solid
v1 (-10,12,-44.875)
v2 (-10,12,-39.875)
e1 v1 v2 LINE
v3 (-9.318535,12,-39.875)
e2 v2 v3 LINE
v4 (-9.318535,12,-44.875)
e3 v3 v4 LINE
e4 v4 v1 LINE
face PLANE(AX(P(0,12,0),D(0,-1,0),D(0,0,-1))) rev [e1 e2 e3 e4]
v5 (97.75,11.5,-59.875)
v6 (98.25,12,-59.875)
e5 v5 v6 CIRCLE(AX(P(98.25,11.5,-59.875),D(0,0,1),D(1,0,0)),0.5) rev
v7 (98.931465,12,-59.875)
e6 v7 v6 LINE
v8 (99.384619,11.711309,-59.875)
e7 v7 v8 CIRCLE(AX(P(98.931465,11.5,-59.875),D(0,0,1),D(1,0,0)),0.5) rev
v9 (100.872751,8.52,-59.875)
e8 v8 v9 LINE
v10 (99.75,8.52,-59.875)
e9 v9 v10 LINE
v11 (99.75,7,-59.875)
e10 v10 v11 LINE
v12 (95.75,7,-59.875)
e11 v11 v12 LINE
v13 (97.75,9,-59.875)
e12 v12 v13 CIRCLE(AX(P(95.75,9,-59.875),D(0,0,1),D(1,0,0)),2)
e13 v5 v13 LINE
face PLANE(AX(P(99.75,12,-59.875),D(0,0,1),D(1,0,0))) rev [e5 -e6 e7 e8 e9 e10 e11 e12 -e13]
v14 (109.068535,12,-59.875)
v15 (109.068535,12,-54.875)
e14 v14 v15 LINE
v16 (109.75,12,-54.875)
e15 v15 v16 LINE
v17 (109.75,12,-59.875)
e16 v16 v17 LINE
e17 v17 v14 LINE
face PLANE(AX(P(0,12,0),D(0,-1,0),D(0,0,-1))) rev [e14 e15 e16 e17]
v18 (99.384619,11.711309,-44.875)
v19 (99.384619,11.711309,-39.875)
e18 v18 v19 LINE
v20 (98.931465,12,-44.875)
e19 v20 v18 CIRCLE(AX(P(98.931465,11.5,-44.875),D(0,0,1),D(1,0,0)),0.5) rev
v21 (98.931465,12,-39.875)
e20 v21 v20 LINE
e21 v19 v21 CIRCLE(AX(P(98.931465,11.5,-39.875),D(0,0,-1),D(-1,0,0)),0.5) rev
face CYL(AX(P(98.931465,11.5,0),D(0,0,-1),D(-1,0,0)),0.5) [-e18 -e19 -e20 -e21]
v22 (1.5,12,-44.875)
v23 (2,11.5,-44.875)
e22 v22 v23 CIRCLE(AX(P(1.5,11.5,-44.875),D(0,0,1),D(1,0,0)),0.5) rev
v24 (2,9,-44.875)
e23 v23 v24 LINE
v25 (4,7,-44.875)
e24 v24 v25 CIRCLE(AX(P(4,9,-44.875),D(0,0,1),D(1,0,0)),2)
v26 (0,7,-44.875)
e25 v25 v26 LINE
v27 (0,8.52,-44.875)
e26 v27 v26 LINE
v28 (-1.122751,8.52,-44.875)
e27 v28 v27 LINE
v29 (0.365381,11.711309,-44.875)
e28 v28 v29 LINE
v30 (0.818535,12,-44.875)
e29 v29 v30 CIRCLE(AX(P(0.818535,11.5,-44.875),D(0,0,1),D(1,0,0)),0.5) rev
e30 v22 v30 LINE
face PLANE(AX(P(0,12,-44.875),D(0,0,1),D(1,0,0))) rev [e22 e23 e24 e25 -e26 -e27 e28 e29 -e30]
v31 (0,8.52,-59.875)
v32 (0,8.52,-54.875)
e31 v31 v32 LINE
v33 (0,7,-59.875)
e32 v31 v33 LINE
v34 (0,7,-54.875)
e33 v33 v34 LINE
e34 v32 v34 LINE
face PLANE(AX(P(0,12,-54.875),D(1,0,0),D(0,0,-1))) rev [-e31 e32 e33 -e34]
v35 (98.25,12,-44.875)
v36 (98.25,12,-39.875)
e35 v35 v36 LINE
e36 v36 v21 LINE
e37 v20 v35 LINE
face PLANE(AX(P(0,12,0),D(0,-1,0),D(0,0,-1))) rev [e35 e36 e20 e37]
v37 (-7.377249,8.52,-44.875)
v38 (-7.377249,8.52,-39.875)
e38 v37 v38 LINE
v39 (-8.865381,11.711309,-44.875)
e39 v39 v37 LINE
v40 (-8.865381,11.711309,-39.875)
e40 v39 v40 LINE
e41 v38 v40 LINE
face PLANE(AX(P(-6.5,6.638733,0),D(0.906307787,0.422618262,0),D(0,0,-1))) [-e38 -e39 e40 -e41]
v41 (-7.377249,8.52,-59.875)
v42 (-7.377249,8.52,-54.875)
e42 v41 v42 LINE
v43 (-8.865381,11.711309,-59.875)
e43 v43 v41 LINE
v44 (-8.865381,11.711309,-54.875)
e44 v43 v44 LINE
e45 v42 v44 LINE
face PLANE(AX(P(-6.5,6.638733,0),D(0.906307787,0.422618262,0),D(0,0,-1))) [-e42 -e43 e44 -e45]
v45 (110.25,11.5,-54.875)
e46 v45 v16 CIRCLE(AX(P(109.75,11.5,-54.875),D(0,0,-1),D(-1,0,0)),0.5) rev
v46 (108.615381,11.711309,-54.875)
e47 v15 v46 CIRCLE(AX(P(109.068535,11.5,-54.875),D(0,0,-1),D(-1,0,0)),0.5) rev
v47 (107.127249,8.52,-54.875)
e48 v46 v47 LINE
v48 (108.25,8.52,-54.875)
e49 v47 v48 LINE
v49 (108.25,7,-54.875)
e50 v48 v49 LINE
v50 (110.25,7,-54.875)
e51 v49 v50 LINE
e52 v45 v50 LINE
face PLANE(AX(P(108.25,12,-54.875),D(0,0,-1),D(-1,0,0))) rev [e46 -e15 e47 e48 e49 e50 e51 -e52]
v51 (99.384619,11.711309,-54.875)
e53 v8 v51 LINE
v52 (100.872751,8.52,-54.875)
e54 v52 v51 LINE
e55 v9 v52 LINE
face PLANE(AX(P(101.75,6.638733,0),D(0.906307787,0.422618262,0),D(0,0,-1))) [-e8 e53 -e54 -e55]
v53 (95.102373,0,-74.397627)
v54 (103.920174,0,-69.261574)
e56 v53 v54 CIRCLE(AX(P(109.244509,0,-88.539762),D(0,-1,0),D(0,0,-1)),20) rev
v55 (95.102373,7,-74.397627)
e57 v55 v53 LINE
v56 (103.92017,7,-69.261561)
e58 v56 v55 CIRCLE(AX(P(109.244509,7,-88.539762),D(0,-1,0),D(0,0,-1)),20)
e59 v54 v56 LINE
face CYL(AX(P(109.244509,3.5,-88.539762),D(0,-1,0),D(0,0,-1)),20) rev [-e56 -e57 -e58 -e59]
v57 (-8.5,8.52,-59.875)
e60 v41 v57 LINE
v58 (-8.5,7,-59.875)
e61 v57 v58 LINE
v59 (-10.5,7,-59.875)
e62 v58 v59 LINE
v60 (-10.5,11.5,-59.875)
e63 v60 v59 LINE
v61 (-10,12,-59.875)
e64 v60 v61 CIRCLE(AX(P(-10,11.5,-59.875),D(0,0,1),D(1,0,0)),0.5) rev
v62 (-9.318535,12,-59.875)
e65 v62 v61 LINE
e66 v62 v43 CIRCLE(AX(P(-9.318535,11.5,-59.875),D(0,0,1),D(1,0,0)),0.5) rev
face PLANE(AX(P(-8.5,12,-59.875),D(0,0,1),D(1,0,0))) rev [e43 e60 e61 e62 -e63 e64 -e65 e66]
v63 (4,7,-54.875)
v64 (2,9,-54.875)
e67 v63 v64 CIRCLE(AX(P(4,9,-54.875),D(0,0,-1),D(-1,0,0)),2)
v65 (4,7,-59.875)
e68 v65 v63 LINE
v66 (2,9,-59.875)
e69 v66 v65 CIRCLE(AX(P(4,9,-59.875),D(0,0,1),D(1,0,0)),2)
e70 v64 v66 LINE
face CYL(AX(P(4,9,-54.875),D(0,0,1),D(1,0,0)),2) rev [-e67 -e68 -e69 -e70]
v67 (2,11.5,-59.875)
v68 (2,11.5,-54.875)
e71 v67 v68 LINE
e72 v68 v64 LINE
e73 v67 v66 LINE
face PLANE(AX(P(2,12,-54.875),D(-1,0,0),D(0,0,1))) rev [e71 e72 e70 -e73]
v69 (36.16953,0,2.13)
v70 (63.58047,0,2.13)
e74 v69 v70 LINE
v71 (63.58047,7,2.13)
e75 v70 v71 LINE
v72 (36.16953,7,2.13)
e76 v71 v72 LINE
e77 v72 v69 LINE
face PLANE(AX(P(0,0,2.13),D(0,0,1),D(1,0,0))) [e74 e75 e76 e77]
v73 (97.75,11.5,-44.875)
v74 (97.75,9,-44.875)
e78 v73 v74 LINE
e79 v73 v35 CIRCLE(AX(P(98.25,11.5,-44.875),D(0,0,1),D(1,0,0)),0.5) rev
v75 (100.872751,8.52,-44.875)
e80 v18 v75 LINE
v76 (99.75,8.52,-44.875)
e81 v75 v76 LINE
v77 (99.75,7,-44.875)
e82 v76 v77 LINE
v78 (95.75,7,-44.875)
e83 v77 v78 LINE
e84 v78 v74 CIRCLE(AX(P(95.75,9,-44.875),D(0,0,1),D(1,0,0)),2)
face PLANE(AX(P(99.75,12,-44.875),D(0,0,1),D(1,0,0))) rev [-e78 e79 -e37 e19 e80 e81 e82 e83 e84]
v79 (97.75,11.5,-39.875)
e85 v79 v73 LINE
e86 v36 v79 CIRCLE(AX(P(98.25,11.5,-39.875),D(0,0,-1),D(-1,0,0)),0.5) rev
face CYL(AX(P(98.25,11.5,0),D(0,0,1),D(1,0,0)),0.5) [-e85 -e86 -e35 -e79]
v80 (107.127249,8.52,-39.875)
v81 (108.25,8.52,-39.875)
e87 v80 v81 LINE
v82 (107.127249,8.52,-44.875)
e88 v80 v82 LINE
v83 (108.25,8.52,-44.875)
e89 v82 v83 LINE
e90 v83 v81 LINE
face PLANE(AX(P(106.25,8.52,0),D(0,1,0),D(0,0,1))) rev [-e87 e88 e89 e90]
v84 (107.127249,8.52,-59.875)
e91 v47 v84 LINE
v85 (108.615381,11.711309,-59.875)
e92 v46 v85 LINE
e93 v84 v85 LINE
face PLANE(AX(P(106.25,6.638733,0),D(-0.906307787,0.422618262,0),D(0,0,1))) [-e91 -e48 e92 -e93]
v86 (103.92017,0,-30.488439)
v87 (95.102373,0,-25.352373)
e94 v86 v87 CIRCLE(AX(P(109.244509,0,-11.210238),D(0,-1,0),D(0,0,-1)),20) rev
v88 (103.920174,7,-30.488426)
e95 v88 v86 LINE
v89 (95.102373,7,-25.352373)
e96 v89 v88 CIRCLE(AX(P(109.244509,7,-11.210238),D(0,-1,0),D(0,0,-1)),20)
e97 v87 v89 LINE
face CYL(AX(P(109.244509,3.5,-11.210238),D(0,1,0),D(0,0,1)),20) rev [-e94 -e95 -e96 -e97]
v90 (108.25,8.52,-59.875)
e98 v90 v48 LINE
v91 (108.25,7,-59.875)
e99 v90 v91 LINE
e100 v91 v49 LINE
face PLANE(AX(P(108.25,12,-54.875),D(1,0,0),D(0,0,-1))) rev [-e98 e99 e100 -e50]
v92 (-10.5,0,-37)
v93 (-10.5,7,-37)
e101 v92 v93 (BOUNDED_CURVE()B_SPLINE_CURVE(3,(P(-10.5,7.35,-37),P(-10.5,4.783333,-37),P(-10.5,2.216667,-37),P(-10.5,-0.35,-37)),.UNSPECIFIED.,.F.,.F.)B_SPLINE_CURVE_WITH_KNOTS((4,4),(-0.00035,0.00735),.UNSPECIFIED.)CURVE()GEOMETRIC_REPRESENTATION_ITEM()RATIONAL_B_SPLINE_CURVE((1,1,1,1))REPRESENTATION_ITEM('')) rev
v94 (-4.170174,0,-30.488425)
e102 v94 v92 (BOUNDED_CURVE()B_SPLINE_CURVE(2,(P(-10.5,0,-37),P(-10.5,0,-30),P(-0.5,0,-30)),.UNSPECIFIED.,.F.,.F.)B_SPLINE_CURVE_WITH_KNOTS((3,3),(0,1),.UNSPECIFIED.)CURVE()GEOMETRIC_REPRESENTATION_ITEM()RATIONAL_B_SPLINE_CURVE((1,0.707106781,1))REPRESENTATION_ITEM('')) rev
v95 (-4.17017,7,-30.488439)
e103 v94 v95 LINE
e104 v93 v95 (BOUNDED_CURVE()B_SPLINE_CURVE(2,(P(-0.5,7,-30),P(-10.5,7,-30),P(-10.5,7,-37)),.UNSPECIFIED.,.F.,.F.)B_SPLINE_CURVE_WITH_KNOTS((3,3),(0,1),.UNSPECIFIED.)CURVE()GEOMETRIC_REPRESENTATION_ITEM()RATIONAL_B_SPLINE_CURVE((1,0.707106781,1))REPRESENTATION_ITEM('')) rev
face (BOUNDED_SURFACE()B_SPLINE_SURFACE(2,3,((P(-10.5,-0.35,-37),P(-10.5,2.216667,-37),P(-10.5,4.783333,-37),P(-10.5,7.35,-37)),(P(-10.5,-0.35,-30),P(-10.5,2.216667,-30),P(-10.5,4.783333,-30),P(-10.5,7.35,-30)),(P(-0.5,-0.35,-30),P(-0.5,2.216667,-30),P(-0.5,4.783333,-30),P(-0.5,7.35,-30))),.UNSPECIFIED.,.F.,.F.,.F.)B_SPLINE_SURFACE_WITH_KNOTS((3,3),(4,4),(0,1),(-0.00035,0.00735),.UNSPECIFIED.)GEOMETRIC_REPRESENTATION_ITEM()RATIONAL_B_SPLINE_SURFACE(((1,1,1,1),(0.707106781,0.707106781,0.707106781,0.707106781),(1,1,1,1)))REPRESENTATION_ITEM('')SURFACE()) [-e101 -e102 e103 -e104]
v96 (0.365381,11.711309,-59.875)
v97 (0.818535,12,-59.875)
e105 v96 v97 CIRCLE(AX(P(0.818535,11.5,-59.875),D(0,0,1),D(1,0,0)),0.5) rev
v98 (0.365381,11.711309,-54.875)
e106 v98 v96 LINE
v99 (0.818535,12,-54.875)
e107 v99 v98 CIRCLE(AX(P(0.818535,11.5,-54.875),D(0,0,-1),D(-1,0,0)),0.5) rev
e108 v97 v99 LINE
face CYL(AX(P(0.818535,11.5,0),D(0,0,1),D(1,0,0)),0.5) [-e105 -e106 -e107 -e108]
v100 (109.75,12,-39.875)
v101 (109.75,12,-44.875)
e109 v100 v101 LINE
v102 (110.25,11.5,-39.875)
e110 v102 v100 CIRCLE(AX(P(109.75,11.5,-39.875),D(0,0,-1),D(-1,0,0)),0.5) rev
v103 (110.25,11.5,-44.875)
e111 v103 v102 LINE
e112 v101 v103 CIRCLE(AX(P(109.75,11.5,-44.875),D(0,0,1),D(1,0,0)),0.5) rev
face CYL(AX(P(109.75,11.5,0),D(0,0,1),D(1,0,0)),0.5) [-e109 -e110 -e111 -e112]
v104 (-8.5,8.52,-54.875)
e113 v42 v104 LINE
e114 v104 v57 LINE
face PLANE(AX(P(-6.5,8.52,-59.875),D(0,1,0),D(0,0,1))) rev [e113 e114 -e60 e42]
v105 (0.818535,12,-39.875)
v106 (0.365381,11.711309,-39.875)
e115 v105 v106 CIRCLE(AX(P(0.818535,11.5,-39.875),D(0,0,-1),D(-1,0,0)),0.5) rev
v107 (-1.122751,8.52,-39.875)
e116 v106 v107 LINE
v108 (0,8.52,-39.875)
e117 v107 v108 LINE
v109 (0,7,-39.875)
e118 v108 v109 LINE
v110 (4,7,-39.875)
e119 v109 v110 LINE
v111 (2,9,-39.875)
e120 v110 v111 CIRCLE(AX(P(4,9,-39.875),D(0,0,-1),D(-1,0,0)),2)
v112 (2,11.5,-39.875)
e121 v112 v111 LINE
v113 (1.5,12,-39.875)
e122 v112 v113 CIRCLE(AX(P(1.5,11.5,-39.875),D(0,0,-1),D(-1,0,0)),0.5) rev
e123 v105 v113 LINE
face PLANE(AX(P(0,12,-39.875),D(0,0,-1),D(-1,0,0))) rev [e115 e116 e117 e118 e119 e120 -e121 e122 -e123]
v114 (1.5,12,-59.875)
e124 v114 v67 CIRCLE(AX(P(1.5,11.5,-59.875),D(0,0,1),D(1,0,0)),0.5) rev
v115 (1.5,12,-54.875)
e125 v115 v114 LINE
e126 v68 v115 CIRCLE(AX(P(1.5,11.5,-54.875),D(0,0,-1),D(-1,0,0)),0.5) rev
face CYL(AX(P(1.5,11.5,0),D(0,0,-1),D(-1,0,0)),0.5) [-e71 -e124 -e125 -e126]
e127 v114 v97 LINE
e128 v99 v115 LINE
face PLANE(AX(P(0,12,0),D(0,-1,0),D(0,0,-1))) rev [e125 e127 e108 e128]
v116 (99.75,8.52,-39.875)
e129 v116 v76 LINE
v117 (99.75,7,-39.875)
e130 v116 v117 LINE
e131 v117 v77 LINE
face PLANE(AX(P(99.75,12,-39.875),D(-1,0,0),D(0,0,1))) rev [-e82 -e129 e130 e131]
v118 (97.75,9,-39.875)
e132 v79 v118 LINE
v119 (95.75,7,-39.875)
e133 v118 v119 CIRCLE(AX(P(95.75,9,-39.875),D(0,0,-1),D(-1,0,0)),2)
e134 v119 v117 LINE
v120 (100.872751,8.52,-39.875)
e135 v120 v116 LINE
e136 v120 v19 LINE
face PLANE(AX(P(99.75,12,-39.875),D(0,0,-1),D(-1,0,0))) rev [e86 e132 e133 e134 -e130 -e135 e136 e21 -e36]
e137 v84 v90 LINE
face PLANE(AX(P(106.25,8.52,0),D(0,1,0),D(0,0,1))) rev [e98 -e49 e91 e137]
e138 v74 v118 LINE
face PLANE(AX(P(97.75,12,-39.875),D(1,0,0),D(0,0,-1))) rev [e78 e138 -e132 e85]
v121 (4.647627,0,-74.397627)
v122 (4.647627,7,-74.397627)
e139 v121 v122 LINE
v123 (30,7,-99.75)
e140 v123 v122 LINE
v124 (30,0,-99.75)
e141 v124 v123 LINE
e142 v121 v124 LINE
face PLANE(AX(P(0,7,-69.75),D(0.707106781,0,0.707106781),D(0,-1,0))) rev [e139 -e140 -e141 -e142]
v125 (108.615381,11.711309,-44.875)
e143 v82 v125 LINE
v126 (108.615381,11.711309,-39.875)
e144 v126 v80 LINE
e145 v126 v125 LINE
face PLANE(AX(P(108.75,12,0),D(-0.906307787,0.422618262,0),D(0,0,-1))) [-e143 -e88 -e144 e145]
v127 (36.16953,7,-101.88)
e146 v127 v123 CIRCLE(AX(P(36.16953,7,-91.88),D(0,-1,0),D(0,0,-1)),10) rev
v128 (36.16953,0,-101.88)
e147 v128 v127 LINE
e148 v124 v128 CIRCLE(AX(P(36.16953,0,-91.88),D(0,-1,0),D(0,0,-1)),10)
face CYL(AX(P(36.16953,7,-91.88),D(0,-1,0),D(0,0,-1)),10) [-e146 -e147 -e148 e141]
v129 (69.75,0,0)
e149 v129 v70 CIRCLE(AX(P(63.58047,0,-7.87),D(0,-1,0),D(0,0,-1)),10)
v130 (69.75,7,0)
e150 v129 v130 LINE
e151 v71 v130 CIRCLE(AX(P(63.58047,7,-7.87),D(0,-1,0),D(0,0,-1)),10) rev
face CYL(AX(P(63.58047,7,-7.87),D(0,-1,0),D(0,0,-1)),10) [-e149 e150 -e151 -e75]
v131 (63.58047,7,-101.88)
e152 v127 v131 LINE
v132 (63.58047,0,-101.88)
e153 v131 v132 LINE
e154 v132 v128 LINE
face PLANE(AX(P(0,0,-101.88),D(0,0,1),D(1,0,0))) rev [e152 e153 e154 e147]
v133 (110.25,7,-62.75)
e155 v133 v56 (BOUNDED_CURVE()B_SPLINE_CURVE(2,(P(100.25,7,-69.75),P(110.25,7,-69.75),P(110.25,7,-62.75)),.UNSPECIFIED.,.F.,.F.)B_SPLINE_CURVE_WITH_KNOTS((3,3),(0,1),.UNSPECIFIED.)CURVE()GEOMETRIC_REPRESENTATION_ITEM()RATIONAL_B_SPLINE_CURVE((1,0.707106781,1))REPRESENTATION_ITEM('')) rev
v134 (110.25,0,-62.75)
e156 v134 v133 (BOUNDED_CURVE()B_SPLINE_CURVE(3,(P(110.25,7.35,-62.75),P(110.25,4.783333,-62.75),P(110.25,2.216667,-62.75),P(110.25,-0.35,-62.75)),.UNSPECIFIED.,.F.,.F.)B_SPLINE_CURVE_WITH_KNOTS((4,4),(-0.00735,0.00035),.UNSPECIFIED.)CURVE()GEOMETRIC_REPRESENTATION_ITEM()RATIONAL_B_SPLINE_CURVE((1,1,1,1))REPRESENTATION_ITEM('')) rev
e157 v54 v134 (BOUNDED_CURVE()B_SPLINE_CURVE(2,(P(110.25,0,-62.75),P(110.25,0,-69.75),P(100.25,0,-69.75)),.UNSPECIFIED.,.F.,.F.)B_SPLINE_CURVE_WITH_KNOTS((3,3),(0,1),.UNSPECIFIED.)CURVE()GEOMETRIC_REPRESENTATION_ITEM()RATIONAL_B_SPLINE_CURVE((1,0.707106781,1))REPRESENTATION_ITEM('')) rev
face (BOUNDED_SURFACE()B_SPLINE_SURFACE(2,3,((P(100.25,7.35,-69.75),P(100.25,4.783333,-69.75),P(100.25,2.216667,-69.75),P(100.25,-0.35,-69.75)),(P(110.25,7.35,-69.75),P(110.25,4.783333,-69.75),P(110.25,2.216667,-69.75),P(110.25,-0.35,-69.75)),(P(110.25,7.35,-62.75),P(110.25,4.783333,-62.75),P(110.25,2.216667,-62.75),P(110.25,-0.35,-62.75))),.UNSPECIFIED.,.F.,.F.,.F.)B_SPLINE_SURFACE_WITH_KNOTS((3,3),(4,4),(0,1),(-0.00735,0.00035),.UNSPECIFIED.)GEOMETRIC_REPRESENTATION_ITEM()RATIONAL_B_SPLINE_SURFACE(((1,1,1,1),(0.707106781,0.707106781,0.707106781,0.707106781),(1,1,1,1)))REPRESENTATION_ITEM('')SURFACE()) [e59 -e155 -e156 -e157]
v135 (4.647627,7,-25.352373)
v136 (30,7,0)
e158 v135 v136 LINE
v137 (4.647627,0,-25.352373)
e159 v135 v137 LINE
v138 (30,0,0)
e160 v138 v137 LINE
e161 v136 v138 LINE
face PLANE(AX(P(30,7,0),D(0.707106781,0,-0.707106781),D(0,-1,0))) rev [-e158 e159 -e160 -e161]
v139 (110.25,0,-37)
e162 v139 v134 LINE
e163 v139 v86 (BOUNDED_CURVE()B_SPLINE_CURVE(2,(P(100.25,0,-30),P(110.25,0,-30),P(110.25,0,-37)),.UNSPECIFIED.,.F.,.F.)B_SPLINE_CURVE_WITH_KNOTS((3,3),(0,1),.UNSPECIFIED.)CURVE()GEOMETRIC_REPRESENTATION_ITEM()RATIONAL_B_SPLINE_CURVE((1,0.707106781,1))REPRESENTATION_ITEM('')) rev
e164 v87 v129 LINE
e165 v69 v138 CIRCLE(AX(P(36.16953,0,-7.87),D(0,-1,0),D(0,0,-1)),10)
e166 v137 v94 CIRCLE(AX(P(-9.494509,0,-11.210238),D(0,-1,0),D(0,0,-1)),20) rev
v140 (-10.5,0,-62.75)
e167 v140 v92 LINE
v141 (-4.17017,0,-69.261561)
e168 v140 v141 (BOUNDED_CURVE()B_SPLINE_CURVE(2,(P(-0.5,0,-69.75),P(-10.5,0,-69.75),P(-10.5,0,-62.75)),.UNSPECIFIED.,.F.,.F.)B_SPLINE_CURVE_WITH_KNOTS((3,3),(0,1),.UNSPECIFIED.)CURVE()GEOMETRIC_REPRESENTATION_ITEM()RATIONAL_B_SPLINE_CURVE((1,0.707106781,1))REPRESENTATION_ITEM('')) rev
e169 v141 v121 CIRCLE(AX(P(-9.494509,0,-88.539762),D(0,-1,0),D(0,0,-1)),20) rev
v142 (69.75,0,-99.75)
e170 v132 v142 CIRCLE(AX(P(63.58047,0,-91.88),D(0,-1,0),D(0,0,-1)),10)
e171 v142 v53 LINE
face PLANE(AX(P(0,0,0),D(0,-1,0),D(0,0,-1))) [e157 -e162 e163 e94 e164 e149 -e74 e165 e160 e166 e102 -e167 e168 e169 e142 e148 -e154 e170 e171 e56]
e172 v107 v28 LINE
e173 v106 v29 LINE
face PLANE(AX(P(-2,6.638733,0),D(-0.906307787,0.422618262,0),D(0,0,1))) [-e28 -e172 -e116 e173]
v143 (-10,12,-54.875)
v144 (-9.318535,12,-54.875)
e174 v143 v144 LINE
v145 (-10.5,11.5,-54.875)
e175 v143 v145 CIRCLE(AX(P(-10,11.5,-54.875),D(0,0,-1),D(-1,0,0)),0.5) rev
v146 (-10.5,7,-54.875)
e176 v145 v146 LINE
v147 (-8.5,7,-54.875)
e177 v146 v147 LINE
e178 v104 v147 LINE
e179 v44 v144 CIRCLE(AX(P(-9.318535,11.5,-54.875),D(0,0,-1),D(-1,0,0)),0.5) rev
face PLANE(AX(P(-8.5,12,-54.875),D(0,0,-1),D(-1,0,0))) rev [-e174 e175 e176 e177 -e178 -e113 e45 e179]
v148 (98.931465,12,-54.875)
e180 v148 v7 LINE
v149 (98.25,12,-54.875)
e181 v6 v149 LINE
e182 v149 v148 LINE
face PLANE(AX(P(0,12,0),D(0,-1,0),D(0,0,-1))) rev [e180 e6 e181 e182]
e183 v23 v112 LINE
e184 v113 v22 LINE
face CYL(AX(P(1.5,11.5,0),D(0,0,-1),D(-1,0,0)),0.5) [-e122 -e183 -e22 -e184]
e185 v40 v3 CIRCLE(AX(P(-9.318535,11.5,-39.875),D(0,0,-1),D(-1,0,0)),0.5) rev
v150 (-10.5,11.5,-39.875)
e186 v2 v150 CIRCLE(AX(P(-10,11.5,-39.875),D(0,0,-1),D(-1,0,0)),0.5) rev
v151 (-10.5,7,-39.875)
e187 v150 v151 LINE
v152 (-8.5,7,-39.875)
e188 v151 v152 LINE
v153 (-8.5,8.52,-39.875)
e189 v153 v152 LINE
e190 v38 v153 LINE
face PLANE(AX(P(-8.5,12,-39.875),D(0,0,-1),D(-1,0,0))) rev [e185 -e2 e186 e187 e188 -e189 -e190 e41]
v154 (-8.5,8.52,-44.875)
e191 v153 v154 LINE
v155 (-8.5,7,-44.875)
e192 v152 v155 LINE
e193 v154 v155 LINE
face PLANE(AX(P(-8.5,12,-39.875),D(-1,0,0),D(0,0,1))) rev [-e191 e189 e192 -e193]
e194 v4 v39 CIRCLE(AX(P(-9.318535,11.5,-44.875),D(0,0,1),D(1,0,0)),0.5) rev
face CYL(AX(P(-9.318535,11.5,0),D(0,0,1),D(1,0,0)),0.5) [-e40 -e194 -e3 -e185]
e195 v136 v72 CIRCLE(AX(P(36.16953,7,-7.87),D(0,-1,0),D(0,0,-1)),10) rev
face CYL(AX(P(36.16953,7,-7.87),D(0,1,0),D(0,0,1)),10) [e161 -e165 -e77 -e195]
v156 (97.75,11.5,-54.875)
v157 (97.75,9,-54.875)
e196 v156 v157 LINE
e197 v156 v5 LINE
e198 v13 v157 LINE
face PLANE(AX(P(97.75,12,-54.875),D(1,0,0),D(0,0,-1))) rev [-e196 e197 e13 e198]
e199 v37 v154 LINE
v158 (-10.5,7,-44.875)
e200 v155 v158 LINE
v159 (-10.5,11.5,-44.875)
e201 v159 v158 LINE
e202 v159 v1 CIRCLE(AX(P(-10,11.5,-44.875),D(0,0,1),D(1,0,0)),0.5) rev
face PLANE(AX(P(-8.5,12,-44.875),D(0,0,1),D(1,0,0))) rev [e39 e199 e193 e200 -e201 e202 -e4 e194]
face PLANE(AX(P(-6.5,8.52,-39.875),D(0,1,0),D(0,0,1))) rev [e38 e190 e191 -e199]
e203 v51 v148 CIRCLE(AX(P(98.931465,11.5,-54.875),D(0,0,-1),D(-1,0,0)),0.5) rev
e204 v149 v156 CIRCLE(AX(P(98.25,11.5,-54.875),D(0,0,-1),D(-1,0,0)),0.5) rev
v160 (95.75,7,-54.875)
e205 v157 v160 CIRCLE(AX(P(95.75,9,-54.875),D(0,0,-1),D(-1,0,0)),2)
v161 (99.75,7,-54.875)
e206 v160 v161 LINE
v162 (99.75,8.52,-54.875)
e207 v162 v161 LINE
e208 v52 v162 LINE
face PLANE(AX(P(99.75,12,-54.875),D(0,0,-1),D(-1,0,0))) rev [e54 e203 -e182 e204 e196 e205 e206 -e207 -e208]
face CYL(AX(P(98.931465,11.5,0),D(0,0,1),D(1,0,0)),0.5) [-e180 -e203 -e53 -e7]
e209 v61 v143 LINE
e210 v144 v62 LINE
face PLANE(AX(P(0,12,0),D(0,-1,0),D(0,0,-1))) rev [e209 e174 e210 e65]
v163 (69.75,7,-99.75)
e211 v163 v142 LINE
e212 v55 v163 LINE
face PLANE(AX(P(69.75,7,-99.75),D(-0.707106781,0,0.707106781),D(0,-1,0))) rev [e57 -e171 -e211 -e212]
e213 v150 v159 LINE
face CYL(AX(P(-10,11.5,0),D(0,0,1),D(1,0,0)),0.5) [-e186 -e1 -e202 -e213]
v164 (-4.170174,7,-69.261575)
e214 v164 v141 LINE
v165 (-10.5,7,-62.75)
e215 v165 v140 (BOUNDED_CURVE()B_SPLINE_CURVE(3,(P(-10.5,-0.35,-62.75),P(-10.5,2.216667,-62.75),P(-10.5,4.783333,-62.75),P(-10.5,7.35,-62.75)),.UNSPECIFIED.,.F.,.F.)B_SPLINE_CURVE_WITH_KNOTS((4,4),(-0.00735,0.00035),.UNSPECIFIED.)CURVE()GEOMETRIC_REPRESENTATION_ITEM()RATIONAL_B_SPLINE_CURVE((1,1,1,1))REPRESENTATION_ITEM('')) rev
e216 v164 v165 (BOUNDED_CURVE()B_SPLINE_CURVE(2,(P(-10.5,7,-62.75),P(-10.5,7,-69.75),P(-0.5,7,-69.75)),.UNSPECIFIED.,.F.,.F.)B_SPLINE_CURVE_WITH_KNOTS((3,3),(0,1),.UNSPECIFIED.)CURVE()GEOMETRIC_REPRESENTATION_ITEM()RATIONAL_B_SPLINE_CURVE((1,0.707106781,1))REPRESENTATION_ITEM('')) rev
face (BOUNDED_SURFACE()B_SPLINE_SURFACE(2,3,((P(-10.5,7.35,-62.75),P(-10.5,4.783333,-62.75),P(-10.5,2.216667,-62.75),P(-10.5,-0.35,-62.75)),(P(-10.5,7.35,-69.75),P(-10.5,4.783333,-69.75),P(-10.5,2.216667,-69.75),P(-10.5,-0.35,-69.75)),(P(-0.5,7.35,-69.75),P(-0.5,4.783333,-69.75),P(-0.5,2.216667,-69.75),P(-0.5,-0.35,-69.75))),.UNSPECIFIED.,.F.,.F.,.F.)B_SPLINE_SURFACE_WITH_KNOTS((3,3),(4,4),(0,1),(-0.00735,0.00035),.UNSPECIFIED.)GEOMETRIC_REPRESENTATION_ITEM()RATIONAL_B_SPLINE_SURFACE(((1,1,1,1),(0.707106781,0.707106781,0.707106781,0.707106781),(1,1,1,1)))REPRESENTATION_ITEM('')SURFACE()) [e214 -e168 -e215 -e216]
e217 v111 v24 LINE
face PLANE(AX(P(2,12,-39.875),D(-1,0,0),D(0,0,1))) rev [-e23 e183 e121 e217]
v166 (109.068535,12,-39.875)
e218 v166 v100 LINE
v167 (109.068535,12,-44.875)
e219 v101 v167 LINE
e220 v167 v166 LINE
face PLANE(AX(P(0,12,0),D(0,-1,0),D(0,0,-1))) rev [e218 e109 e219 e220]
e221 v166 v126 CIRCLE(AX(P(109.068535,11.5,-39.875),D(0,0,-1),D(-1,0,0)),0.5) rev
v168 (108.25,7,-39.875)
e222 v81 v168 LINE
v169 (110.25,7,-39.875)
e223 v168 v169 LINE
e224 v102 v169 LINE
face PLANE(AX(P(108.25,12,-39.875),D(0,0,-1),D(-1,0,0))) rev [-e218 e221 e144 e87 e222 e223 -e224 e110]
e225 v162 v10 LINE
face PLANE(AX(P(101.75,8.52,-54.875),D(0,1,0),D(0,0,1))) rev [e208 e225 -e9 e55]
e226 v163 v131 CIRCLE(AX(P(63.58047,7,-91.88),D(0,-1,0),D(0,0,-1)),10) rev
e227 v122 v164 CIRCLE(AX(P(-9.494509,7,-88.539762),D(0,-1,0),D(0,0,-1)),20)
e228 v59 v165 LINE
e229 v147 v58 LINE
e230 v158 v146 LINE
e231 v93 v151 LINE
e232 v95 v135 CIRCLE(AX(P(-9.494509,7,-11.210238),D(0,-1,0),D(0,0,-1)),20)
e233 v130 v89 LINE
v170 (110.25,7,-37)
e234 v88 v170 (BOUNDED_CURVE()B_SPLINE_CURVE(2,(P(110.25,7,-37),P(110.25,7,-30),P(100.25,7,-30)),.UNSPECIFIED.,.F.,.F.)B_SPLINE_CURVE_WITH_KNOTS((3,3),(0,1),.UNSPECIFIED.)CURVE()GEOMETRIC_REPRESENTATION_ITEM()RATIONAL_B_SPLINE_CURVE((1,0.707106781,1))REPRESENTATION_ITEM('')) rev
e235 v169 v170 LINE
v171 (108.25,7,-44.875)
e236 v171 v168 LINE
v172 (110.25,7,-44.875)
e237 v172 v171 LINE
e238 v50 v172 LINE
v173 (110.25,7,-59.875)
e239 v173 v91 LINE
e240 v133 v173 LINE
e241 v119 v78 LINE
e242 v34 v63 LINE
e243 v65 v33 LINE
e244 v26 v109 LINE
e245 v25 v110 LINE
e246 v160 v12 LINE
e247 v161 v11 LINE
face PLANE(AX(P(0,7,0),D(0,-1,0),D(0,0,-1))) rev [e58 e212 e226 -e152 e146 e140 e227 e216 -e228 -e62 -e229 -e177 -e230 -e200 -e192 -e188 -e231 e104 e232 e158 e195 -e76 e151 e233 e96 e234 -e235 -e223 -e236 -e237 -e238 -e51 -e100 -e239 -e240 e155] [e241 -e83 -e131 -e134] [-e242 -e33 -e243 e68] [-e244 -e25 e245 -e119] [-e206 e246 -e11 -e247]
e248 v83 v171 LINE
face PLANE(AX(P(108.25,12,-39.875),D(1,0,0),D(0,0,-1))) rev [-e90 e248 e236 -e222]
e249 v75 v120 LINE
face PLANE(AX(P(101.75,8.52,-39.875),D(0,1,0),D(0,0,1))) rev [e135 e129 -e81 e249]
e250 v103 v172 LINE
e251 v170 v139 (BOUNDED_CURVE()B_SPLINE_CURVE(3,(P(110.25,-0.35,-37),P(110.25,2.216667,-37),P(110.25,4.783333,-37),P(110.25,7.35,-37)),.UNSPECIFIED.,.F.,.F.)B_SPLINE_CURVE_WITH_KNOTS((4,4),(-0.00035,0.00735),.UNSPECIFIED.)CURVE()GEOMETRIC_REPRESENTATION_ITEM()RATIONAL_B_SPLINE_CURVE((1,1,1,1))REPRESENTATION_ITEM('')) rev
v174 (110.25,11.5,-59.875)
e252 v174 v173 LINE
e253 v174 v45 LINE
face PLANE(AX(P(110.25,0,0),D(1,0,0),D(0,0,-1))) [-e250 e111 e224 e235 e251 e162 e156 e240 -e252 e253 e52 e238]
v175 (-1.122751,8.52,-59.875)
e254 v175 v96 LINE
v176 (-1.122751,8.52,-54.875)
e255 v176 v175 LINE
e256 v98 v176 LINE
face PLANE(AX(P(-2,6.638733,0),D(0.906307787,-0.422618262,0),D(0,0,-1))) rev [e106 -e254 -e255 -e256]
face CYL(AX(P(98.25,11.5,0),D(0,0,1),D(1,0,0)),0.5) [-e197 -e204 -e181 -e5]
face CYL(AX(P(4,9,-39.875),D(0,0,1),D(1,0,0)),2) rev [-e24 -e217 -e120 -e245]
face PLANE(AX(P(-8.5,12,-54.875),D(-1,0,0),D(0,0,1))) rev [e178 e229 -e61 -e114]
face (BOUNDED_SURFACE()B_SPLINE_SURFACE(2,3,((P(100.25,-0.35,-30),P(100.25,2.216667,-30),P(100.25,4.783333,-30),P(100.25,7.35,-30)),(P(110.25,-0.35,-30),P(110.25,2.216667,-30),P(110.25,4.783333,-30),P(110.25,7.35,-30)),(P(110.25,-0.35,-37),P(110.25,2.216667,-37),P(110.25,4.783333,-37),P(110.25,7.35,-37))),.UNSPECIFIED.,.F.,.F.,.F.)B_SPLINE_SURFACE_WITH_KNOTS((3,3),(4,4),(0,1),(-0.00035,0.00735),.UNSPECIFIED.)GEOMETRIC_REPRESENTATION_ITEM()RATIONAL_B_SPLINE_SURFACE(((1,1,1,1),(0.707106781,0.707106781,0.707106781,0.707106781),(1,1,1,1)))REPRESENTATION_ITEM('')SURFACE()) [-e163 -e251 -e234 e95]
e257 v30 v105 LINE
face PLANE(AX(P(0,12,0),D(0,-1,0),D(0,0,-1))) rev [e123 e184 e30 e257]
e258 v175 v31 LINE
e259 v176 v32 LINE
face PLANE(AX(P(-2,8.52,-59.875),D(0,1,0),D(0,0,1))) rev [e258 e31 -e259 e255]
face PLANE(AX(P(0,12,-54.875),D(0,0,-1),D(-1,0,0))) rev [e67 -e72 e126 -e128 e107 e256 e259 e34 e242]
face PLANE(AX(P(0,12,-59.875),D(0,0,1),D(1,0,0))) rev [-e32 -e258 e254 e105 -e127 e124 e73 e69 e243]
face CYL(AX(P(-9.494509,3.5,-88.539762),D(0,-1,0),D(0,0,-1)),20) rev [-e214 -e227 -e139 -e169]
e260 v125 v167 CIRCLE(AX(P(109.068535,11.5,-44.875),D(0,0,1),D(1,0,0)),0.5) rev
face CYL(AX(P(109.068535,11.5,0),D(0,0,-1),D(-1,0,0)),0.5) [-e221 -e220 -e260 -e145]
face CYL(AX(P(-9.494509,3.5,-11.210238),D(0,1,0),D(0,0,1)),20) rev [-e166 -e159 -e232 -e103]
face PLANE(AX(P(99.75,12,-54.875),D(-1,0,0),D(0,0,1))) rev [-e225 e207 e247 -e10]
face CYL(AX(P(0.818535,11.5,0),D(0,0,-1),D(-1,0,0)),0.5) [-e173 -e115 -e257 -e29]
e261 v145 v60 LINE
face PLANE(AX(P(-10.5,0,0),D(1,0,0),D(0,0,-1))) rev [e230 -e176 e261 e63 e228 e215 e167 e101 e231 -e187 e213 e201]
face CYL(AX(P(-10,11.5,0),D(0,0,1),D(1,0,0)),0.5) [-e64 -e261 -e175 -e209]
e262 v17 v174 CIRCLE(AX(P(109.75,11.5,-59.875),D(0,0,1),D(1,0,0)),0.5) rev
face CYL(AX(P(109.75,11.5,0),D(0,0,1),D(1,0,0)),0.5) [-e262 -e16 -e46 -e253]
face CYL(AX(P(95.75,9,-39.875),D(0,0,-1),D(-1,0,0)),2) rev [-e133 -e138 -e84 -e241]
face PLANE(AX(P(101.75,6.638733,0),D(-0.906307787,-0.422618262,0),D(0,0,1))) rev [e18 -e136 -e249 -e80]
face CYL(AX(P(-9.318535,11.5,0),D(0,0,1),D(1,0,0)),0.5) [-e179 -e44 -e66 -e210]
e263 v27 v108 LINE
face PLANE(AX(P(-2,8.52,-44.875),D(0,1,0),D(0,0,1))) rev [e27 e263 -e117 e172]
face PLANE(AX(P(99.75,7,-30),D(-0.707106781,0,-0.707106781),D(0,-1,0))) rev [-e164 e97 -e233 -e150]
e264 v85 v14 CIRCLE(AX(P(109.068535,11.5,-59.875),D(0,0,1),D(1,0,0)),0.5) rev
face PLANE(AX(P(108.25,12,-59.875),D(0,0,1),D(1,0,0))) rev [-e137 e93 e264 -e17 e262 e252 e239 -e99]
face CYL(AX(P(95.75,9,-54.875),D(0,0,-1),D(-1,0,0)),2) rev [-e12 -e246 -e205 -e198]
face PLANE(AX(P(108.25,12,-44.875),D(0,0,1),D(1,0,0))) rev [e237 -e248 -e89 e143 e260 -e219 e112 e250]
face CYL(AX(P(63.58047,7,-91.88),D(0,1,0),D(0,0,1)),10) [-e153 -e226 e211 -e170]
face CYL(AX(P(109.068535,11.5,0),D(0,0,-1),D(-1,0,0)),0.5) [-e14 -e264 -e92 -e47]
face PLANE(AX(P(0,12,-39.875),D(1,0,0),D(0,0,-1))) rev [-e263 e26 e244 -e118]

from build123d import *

# Parameters (mm, degrees)
SKETCH1_W            = 99.75
SKETCH1_H            = 99.75
BOSS_EXTRUDE5_DEPTH  = 7
CHAMFER2_SIZE        = 30
SKETCH6_W            = 39.75
SKETCH6_H            = 7
BOSS_EXTRUDE7_DEPTH  = 2.13
SKETCH8_W            = 39.75
SKETCH8_H            = 7
BOSS_EXTRUDE10_DEPTH = 2.13
SKETCH12_W           = 39.75
SKETCH12_H           = 7
BOSS_EXTRUDE14_DEPTH = 10.5
SKETCH14_W           = 39.75
SKETCH14_H           = 7
BOSS_EXTRUDE16_DEPTH = 10.5
SKETCH15_W           = 2
SKETCH15_H           = 5
BOSS_EXTRUDE17_DEPTH = 5
FILLET5_R            = 2
SKETCH16_W           = 5
SKETCH16_H           = 3.48
BOSS_EXTRUDE18_DEPTH = 2
SKETCH17_W           = 5
SKETCH17_H           = 3.48
BOSS_EXTRUDE19_DEPTH = 2
SKETCH18_W           = 5
SKETCH18_H           = 3.48
BOSS_EXTRUDE20_DEPTH = 2
SKETCH19_W           = 5
SKETCH19_H           = 3.48
BOSS_EXTRUDE21_DEPTH = 2
CHAMFER6_SIZE        = 5.361267301
CHAMFER6_SIZE_2      = 2.5
CHAMFER7_SIZE        = 5.361267301
CHAMFER7_SIZE_2      = 2.5
FILLET6_R            = 0.5
FILLET7_SIZE         = 10
FILLET7_SIZE_2       = 7
FILLET8_R            = 20
FILLET9_R            = 10


with BuildPart() as part:
    # Sketch1 → Boss-Extrude5 (new body)
    with BuildSketch(Plane(origin=(0, 0, 0), x_dir=(1, 0, 0), z_dir=(0, 1, 0))):
        with Locations((49.875, 49.875)):
            Rectangle(SKETCH1_W, SKETCH1_H)
    extrude(amount=BOSS_EXTRUDE5_DEPTH)

    # Chamfer2
    chamfer2_edges = [part.edges().sort_by_distance(p)[0] for p in [
        (0, 3.5, -99.75),
        (99.75, 3.5, -99.75),
        (99.75, 3.5, 0),
        (0, 3.5, 0),
    ]]
    chamfer(chamfer2_edges, length=CHAMFER2_SIZE)

    # Sketch6 → Boss-Extrude7 (add)
    with BuildSketch(Plane.XY):
        with Locations((49.875, 3.5)):
            Rectangle(SKETCH6_W, SKETCH6_H)
    extrude(amount=BOSS_EXTRUDE7_DEPTH)

    # Sketch8 → Boss-Extrude10 (add)
    with BuildSketch(Plane(origin=(0, 0, -99.75), x_dir=(-1, 0, 0), z_dir=(0, 0, -1))):
        with Locations((-49.875, 3.5)):
            Rectangle(SKETCH8_W, SKETCH8_H)
    extrude(amount=BOSS_EXTRUDE10_DEPTH)

    # Sketch12 → Boss-Extrude14 (add)
    with BuildSketch(Plane.ZY):
        with Locations((-49.875, 3.5)):
            Rectangle(SKETCH12_W, SKETCH12_H)
    extrude(amount=BOSS_EXTRUDE14_DEPTH)

    # Sketch14 → Boss-Extrude16 (add)
    with BuildSketch(Plane(origin=(99.75, 0, 0), x_dir=(0, 0, -1), z_dir=(1, 0, 0))):
        with Locations((49.875, 3.5)):
            Rectangle(SKETCH14_W, SKETCH14_H)
    extrude(amount=BOSS_EXTRUDE16_DEPTH)

    # Sketch15 → Boss-Extrude17 (add)
    with BuildSketch(Plane(origin=(0, 7, 0), x_dir=(1, 0, 0), z_dir=(0, 1, 0))):
        with Locations((1, 42.375)):
            Rectangle(SKETCH15_W, SKETCH15_H)
        with Locations((1, 57.375)):
            Rectangle(SKETCH15_W, SKETCH15_H)
        with Locations((-9.5, 57.375)):
            Rectangle(SKETCH15_W, SKETCH15_H)
        with Locations((-9.5, 42.375)):
            Rectangle(SKETCH15_W, SKETCH15_H)
        with Locations((109.25, 42.375)):
            Rectangle(SKETCH15_W, SKETCH15_H)
        with Locations((109.25, 57.375)):
            Rectangle(SKETCH15_W, SKETCH15_H)
        with Locations((98.75, 57.375)):
            Rectangle(SKETCH15_W, SKETCH15_H)
        with Locations((98.75, 42.375)):
            Rectangle(SKETCH15_W, SKETCH15_H)
    extrude(amount=BOSS_EXTRUDE17_DEPTH)

    # Fillet5
    fillet5_edges = [part.edges().sort_by_distance(p)[0] for p in [
        (2, 7, -57.375),
        (97.75, 7, -57.375),
        (97.75, 7, -42.375),
        (2, 7, -42.375),
    ]]
    fillet(fillet5_edges, radius=FILLET5_R)

    # Sketch16 → Boss-Extrude18 (add)
    with BuildSketch(Plane(origin=(99.75, 0, 0), x_dir=(0, 0, -1), z_dir=(1, 0, 0))):
        with Locations((42.375, 10.26)):
            Rectangle(SKETCH16_W, SKETCH16_H)
        with Locations((57.375, 10.26)):
            Rectangle(SKETCH16_W, SKETCH16_H)
    extrude(amount=BOSS_EXTRUDE18_DEPTH)

    # Sketch17 → Boss-Extrude19 (add)
    with BuildSketch(Plane.ZY.offset(-108.25)):
        with Locations((-57.375, 10.26)):
            Rectangle(SKETCH17_W, SKETCH17_H)
        with Locations((-42.375, 10.26)):
            Rectangle(SKETCH17_W, SKETCH17_H)
    extrude(amount=BOSS_EXTRUDE19_DEPTH)

    # Sketch18 → Boss-Extrude20 (add)
    with BuildSketch(Plane.ZY):
        with Locations((-57.375, 10.26)):
            Rectangle(SKETCH18_W, SKETCH18_H)
        with Locations((-42.375, 10.26)):
            Rectangle(SKETCH18_W, SKETCH18_H)
    extrude(amount=BOSS_EXTRUDE20_DEPTH)

    # Sketch19 → Boss-Extrude21 (add)
    with BuildSketch(Plane(origin=(-8.5, 0, 0), x_dir=(0, 0, -1), z_dir=(1, 0, 0))):
        with Locations((57.375, 10.26)):
            Rectangle(SKETCH19_W, SKETCH19_H)
        with Locations((42.375, 10.26)):
            Rectangle(SKETCH19_W, SKETCH19_H)
    extrude(amount=BOSS_EXTRUDE21_DEPTH)

    # Chamfer6
    # the kernel refuses this chamfer: 5.361267301, 2.5 mm, written as the material it takes off along each edge
    with BuildSketch(Plane(origin=(106.25, 12, -44.875), x_dir=(-0.016311164131111014, -0.9998669641130703, 0), z_dir=(0, 0, 1))) as chamfer6_piece_1_section:
        Polygon((CHAMFER6_SIZE * 0.999866964164, CHAMFER6_SIZE * 0.0163111641319), (-CHAMFER6_SIZE_2 * 0.0163111641311, CHAMFER6_SIZE_2 * 0.999866964113), (0, 0), align=None)
    chamfer6_piece_1 = extrude(amount=18.890912073, mode=Mode.PRIVATE)
    chamfer6_piece_1 = split(chamfer6_piece_1, bisect_by=Plane(origin=(107.159289271, 8.52, -42.375), z_dir=(0, 1, 0)), keep=Keep.TOP, mode=Mode.PRIVATE)
    add(chamfer6_piece_1, mode=Mode.SUBTRACT)

    # Chamfer7
    # the kernel refuses this chamfer: 5.361267301, 2.5 mm, written as the material it takes off along each edge
    with BuildSketch(Plane(origin=(101.75, 12, -58.765912073), x_dir=(0.016311164131111014, -0.9998669641130703, 0), z_dir=(0, 0, 1))) as chamfer7_piece_1_section:
        Polygon((CHAMFER7_SIZE * 0.999866964164, -CHAMFER7_SIZE * 0.0163111641319), (-CHAMFER7_SIZE_2 * 0.0163111641311, -CHAMFER7_SIZE_2 * 0.999866964113), (0, 0), align=None)
    chamfer7_piece_1 = extrude(amount=32.781824147, mode=Mode.PRIVATE)
    chamfer7_piece_1 = split(chamfer7_piece_1, bisect_by=Plane(origin=(100.840710729, 8.52, -56.820456037), z_dir=(0, 1, 0)), keep=Keep.TOP, mode=Mode.PRIVATE)
    add(chamfer7_piece_1, mode=Mode.SUBTRACT)
    with BuildSketch(Plane(origin=(101.75, 12, -40.984087927), x_dir=(0.016311164131111014, -0.9998669641130703, 0), z_dir=(0, 0, -1))) as chamfer7_piece_2_section:
        Polygon((CHAMFER7_SIZE * 0.999866964164, CHAMFER7_SIZE * 0.0163111641319), (-CHAMFER7_SIZE_2 * 0.0163111641311, CHAMFER7_SIZE_2 * 0.999866964113), (0, 0), align=None)
    chamfer7_piece_2 = extrude(amount=32.781824147, mode=Mode.PRIVATE)
    chamfer7_piece_2 = split(chamfer7_piece_2, bisect_by=Plane(origin=(100.840710729, 8.52, -42.929543963), z_dir=(0, 1, 0)), keep=Keep.TOP, mode=Mode.PRIVATE)
    add(chamfer7_piece_2, mode=Mode.SUBTRACT)
    with BuildSketch(Plane(origin=(106.25, 12, -40.984087927), x_dir=(0.9971975577536774, 0.07481330637060021, 0), z_dir=(0, 0, -1))) as chamfer7_piece_3_section:
        Polygon((CHAMFER7_SIZE_2 * 0.997197557754, CHAMFER7_SIZE_2 * 0.0748133063706), (-CHAMFER7_SIZE * 0.0748133063744, CHAMFER7_SIZE * 0.997197557805), (0, 0), align=None)
    chamfer7_piece_3 = extrude(amount=32.781824147, mode=Mode.PRIVATE)
    chamfer7_piece_3 = split(chamfer7_piece_3, bisect_by=Plane(origin=(107.159289271, 8.52, -57.375), z_dir=(0, 1, 0)), keep=Keep.TOP, mode=Mode.PRIVATE)
    add(chamfer7_piece_3, mode=Mode.SUBTRACT)
    with BuildSketch(Plane(origin=(-2, 12, -40.984087927), x_dir=(-0.016311164131110216, -0.9998669641130703, 0), z_dir=(0, 0, -1))) as chamfer7_piece_4_section:
        Polygon((CHAMFER7_SIZE * 0.999866964164, -CHAMFER7_SIZE * 0.0163111641319), (-CHAMFER7_SIZE_2 * 0.0163111641311, -CHAMFER7_SIZE_2 * 0.999866964113), (0, 0), align=None)
    chamfer7_piece_4 = extrude(amount=32.781824147, mode=Mode.PRIVATE)
    chamfer7_piece_4 = split(chamfer7_piece_4, bisect_by=Plane(origin=(-1.090710729, 8.52, -42.929543963), z_dir=(0, 1, 0)), keep=Keep.TOP, mode=Mode.PRIVATE)
    add(chamfer7_piece_4, mode=Mode.SUBTRACT)
    with BuildSketch(Plane(origin=(-2, 12, -58.765912073), x_dir=(-0.016311164131110216, -0.9998669641130703, 0), z_dir=(0, 0, 1))) as chamfer7_piece_5_section:
        Polygon((CHAMFER7_SIZE * 0.999866964164, CHAMFER7_SIZE * 0.0163111641319), (-CHAMFER7_SIZE_2 * 0.0163111641311, CHAMFER7_SIZE_2 * 0.999866964113), (0, 0), align=None)
    chamfer7_piece_5 = extrude(amount=32.781824147, mode=Mode.PRIVATE)
    chamfer7_piece_5 = split(chamfer7_piece_5, bisect_by=Plane(origin=(-1.090710729, 8.52, -56.820456037), z_dir=(0, 1, 0)), keep=Keep.TOP, mode=Mode.PRIVATE)
    add(chamfer7_piece_5, mode=Mode.SUBTRACT)
    with BuildSketch(Plane(origin=(-6.5, 12, -40.984087927), x_dir=(-0.9971975577536774, 0.07481330637060031, 0), z_dir=(0, 0, -1))) as chamfer7_piece_6_section:
        Polygon((CHAMFER7_SIZE_2 * 0.997197557754, -CHAMFER7_SIZE_2 * 0.0748133063706), (-CHAMFER7_SIZE * 0.0748133063744, -CHAMFER7_SIZE * 0.997197557805), (0, 0), align=None)
    chamfer7_piece_6 = extrude(amount=32.781824147, mode=Mode.PRIVATE)
    chamfer7_piece_6 = split(chamfer7_piece_6, bisect_by=Plane(origin=(-7.409289271, 8.52, -42.929543963), z_dir=(0, 1, 0)), keep=Keep.TOP, mode=Mode.PRIVATE)
    add(chamfer7_piece_6, mode=Mode.SUBTRACT)
    with BuildSketch(Plane(origin=(-6.5, 12, -25.984087927), x_dir=(-0.9971975577536774, 0.07481330637060031, 0), z_dir=(0, 0, -1))) as chamfer7_piece_7_section:
        Polygon((CHAMFER7_SIZE_2 * 0.997197557754, -CHAMFER7_SIZE_2 * 0.0748133063706), (-CHAMFER7_SIZE * 0.0748133063744, -CHAMFER7_SIZE * 0.997197557805), (0, 0), align=None)
    chamfer7_piece_7 = extrude(amount=32.781824147, mode=Mode.PRIVATE)
    chamfer7_piece_7 = split(chamfer7_piece_7, bisect_by=Plane(origin=(-7.409289271, 8.52, -42.375), z_dir=(0, 1, 0)), keep=Keep.TOP, mode=Mode.PRIVATE)
    add(chamfer7_piece_7, mode=Mode.SUBTRACT)

    # Fillet6
    fillet6_edges = [part.edges().sort_by_distance(p)[0] for p in [
        (2, 12, -57.375),
        (-10.5, 12, -57.375),
        (-10.5, 12, -42.375),
        (110.25, 12, -42.375),
        (110.25, 12, -57.375),
        (97.75, 12, -57.375),
        (97.75, 12, -42.375),
        (108.75, 12, -42.375),
        (-9, 12, -42.375),
        (-9, 12, -57.375),
        (0.5, 12, -57.375),
        (0.5, 12, -42.375),
        (99.25, 12, -42.375),
        (99.25, 12, -57.375),
        (108.75, 12, -57.375),
        (2, 12, -42.375),
    ]]
    fillet(fillet6_edges, radius=FILLET6_R)

    # Fillet7
    # an asymmetric fillet: 10, 7 mm, written as the material it takes off along each edge
    with BuildSketch(Plane(origin=(-10.5, 32, -69.75), x_dir=(1, 0, 0), z_dir=(0, -1, 0))) as fillet7_piece_1:
        with BuildLine():
            Bezier((FILLET7_SIZE, 0), (0, 0), (0, FILLET7_SIZE_2), weights=[1, 0.707106781, 1])
            Line((0, FILLET7_SIZE_2), (0, 0))
            Line((0, 0), (FILLET7_SIZE, 0))
        make_face()
    extrude(amount=57, mode=Mode.SUBTRACT)
    with BuildSketch(Plane(origin=(-10.5, -25, -30), x_dir=(0, 0, -1), z_dir=(0, 1, 0))) as fillet7_piece_2:
        with BuildLine():
            Bezier((FILLET7_SIZE_2, 0), (0, 0), (0, -FILLET7_SIZE), weights=[1, 0.707106781, 1])
            Line((0, -FILLET7_SIZE), (0, 0))
            Line((0, 0), (FILLET7_SIZE_2, 0))
        make_face()
    extrude(amount=57, mode=Mode.SUBTRACT)
    with BuildSketch(Plane(origin=(110.25, 32, -69.75), x_dir=(0, 0, 1), z_dir=(0, -1, 0))) as fillet7_piece_3:
        with BuildLine():
            Bezier((FILLET7_SIZE_2, 0), (0, 0), (0, FILLET7_SIZE), weights=[1, 0.707106781, 1])
            Line((0, FILLET7_SIZE), (0, 0))
            Line((0, 0), (FILLET7_SIZE_2, 0))
        make_face()
    extrude(amount=57, mode=Mode.SUBTRACT)
    with BuildSketch(Plane(origin=(110.25, -25, -30), x_dir=(-1, 0, 0), z_dir=(0, 1, 0))) as fillet7_piece_4:
        with BuildLine():
            Bezier((FILLET7_SIZE, 0), (0, 0), (0, -FILLET7_SIZE_2), weights=[1, 0.707106781, 1])
            Line((0, -FILLET7_SIZE_2), (0, 0))
            Line((0, 0), (FILLET7_SIZE, 0))
        make_face()
    extrude(amount=57, mode=Mode.SUBTRACT)

    # Fillet8
    fillet8_edges = [part.edges().sort_by_distance(p)[0] for p in [
        (0, 3.5, -30),
        (0, 3.5, -69.75),
        (99.75, 3.5, -69.75),
        (99.75, 3.5, -30),
    ]]
    fillet(fillet8_edges, radius=FILLET8_R)

    # Fillet9
    # the kernel refuses this fillet: 10 mm, written as the material it takes off along each edge
    with BuildSketch(Plane(origin=(30, -15.423824915, 2.13), x_dir=(0, 0, -1), z_dir=(0, 1, 0))) as fillet9_piece_1:
        with BuildLine():
            CenterArc((10, -6.169529966), FILLET9_R, 141.906034037, 38.093965963)
            Line((0, -6.169529966), (-0.2, -6.169529966))
            Line((-0.2, -6.169529966), (-0.2, 0))
            Line((-0.2, 0), (0, 0.2))
            ThreePointArc((0, 0.2), (1.065, 0.2), (1.9726, 0.123390599))
            Line((1.9726, 0.123390599), (2.13, 0))
        make_face()
    extrude(amount=37.847649829, mode=Mode.SUBTRACT)
    with BuildSketch(Plane(origin=(69.75, 22.423824915, 2.13), x_dir=(-1, 0, 0), z_dir=(0, -1, 0))) as fillet9_piece_2:
        with BuildLine():
            CenterArc((6.169529966, 10), FILLET9_R, 231.906034037, 38.093965963)
            Line((0, 2.13), (-0.123390599, 1.9726))
            ThreePointArc((-0.123390599, 1.9726), (-0.2, 1.065), (-0.2, 0))
            Line((-0.2, 0), (0, -0.2))
            Line((0, -0.2), (6.169529966, -0.2))
            Line((6.169529966, -0.2), (6.169529966, 0))
        make_face()
    extrude(amount=37.847649829, mode=Mode.SUBTRACT)
    with BuildSketch(Plane(origin=(30, -15.423824915, -101.88), x_dir=(0, 0, 1), z_dir=(0, 1, 0))) as fillet9_piece_3:
        with BuildLine():
            CenterArc((10, 6.169529966), FILLET9_R, 180, 38.093965963)
            Line((0, 6.169529966), (-0.2, 6.169529966))
            Line((-0.2, 6.169529966), (-0.2, 0))
            Line((-0.2, 0), (0, -0.2))
            ThreePointArc((0, -0.2), (1.065, -0.2), (1.9726, -0.123390599))
            Line((1.9726, -0.123390599), (2.13, 0))
        make_face()
    extrude(amount=37.847649829, mode=Mode.SUBTRACT)
    with BuildSketch(Plane(origin=(69.75, 22.423824915, -101.88), x_dir=(-1, 0, 0), z_dir=(0, -1, 0))) as fillet9_piece_4:
        with BuildLine():
            CenterArc((6.169529966, -10), FILLET9_R, 90, 38.093965963)
            Line((0, -2.13), (-0.123390599, -1.9726))
            ThreePointArc((-0.123390599, -1.9726), (-0.2, -1.065), (-0.2, 0))
            Line((-0.2, 0), (0, 0.2))
            Line((0, 0.2), (6.169529966, 0.2))
            Line((6.169529966, 0.2), (6.169529966, 0))
        make_face()
    extrude(amount=37.847649829, mode=Mode.SUBTRACT)


solid = part.part
